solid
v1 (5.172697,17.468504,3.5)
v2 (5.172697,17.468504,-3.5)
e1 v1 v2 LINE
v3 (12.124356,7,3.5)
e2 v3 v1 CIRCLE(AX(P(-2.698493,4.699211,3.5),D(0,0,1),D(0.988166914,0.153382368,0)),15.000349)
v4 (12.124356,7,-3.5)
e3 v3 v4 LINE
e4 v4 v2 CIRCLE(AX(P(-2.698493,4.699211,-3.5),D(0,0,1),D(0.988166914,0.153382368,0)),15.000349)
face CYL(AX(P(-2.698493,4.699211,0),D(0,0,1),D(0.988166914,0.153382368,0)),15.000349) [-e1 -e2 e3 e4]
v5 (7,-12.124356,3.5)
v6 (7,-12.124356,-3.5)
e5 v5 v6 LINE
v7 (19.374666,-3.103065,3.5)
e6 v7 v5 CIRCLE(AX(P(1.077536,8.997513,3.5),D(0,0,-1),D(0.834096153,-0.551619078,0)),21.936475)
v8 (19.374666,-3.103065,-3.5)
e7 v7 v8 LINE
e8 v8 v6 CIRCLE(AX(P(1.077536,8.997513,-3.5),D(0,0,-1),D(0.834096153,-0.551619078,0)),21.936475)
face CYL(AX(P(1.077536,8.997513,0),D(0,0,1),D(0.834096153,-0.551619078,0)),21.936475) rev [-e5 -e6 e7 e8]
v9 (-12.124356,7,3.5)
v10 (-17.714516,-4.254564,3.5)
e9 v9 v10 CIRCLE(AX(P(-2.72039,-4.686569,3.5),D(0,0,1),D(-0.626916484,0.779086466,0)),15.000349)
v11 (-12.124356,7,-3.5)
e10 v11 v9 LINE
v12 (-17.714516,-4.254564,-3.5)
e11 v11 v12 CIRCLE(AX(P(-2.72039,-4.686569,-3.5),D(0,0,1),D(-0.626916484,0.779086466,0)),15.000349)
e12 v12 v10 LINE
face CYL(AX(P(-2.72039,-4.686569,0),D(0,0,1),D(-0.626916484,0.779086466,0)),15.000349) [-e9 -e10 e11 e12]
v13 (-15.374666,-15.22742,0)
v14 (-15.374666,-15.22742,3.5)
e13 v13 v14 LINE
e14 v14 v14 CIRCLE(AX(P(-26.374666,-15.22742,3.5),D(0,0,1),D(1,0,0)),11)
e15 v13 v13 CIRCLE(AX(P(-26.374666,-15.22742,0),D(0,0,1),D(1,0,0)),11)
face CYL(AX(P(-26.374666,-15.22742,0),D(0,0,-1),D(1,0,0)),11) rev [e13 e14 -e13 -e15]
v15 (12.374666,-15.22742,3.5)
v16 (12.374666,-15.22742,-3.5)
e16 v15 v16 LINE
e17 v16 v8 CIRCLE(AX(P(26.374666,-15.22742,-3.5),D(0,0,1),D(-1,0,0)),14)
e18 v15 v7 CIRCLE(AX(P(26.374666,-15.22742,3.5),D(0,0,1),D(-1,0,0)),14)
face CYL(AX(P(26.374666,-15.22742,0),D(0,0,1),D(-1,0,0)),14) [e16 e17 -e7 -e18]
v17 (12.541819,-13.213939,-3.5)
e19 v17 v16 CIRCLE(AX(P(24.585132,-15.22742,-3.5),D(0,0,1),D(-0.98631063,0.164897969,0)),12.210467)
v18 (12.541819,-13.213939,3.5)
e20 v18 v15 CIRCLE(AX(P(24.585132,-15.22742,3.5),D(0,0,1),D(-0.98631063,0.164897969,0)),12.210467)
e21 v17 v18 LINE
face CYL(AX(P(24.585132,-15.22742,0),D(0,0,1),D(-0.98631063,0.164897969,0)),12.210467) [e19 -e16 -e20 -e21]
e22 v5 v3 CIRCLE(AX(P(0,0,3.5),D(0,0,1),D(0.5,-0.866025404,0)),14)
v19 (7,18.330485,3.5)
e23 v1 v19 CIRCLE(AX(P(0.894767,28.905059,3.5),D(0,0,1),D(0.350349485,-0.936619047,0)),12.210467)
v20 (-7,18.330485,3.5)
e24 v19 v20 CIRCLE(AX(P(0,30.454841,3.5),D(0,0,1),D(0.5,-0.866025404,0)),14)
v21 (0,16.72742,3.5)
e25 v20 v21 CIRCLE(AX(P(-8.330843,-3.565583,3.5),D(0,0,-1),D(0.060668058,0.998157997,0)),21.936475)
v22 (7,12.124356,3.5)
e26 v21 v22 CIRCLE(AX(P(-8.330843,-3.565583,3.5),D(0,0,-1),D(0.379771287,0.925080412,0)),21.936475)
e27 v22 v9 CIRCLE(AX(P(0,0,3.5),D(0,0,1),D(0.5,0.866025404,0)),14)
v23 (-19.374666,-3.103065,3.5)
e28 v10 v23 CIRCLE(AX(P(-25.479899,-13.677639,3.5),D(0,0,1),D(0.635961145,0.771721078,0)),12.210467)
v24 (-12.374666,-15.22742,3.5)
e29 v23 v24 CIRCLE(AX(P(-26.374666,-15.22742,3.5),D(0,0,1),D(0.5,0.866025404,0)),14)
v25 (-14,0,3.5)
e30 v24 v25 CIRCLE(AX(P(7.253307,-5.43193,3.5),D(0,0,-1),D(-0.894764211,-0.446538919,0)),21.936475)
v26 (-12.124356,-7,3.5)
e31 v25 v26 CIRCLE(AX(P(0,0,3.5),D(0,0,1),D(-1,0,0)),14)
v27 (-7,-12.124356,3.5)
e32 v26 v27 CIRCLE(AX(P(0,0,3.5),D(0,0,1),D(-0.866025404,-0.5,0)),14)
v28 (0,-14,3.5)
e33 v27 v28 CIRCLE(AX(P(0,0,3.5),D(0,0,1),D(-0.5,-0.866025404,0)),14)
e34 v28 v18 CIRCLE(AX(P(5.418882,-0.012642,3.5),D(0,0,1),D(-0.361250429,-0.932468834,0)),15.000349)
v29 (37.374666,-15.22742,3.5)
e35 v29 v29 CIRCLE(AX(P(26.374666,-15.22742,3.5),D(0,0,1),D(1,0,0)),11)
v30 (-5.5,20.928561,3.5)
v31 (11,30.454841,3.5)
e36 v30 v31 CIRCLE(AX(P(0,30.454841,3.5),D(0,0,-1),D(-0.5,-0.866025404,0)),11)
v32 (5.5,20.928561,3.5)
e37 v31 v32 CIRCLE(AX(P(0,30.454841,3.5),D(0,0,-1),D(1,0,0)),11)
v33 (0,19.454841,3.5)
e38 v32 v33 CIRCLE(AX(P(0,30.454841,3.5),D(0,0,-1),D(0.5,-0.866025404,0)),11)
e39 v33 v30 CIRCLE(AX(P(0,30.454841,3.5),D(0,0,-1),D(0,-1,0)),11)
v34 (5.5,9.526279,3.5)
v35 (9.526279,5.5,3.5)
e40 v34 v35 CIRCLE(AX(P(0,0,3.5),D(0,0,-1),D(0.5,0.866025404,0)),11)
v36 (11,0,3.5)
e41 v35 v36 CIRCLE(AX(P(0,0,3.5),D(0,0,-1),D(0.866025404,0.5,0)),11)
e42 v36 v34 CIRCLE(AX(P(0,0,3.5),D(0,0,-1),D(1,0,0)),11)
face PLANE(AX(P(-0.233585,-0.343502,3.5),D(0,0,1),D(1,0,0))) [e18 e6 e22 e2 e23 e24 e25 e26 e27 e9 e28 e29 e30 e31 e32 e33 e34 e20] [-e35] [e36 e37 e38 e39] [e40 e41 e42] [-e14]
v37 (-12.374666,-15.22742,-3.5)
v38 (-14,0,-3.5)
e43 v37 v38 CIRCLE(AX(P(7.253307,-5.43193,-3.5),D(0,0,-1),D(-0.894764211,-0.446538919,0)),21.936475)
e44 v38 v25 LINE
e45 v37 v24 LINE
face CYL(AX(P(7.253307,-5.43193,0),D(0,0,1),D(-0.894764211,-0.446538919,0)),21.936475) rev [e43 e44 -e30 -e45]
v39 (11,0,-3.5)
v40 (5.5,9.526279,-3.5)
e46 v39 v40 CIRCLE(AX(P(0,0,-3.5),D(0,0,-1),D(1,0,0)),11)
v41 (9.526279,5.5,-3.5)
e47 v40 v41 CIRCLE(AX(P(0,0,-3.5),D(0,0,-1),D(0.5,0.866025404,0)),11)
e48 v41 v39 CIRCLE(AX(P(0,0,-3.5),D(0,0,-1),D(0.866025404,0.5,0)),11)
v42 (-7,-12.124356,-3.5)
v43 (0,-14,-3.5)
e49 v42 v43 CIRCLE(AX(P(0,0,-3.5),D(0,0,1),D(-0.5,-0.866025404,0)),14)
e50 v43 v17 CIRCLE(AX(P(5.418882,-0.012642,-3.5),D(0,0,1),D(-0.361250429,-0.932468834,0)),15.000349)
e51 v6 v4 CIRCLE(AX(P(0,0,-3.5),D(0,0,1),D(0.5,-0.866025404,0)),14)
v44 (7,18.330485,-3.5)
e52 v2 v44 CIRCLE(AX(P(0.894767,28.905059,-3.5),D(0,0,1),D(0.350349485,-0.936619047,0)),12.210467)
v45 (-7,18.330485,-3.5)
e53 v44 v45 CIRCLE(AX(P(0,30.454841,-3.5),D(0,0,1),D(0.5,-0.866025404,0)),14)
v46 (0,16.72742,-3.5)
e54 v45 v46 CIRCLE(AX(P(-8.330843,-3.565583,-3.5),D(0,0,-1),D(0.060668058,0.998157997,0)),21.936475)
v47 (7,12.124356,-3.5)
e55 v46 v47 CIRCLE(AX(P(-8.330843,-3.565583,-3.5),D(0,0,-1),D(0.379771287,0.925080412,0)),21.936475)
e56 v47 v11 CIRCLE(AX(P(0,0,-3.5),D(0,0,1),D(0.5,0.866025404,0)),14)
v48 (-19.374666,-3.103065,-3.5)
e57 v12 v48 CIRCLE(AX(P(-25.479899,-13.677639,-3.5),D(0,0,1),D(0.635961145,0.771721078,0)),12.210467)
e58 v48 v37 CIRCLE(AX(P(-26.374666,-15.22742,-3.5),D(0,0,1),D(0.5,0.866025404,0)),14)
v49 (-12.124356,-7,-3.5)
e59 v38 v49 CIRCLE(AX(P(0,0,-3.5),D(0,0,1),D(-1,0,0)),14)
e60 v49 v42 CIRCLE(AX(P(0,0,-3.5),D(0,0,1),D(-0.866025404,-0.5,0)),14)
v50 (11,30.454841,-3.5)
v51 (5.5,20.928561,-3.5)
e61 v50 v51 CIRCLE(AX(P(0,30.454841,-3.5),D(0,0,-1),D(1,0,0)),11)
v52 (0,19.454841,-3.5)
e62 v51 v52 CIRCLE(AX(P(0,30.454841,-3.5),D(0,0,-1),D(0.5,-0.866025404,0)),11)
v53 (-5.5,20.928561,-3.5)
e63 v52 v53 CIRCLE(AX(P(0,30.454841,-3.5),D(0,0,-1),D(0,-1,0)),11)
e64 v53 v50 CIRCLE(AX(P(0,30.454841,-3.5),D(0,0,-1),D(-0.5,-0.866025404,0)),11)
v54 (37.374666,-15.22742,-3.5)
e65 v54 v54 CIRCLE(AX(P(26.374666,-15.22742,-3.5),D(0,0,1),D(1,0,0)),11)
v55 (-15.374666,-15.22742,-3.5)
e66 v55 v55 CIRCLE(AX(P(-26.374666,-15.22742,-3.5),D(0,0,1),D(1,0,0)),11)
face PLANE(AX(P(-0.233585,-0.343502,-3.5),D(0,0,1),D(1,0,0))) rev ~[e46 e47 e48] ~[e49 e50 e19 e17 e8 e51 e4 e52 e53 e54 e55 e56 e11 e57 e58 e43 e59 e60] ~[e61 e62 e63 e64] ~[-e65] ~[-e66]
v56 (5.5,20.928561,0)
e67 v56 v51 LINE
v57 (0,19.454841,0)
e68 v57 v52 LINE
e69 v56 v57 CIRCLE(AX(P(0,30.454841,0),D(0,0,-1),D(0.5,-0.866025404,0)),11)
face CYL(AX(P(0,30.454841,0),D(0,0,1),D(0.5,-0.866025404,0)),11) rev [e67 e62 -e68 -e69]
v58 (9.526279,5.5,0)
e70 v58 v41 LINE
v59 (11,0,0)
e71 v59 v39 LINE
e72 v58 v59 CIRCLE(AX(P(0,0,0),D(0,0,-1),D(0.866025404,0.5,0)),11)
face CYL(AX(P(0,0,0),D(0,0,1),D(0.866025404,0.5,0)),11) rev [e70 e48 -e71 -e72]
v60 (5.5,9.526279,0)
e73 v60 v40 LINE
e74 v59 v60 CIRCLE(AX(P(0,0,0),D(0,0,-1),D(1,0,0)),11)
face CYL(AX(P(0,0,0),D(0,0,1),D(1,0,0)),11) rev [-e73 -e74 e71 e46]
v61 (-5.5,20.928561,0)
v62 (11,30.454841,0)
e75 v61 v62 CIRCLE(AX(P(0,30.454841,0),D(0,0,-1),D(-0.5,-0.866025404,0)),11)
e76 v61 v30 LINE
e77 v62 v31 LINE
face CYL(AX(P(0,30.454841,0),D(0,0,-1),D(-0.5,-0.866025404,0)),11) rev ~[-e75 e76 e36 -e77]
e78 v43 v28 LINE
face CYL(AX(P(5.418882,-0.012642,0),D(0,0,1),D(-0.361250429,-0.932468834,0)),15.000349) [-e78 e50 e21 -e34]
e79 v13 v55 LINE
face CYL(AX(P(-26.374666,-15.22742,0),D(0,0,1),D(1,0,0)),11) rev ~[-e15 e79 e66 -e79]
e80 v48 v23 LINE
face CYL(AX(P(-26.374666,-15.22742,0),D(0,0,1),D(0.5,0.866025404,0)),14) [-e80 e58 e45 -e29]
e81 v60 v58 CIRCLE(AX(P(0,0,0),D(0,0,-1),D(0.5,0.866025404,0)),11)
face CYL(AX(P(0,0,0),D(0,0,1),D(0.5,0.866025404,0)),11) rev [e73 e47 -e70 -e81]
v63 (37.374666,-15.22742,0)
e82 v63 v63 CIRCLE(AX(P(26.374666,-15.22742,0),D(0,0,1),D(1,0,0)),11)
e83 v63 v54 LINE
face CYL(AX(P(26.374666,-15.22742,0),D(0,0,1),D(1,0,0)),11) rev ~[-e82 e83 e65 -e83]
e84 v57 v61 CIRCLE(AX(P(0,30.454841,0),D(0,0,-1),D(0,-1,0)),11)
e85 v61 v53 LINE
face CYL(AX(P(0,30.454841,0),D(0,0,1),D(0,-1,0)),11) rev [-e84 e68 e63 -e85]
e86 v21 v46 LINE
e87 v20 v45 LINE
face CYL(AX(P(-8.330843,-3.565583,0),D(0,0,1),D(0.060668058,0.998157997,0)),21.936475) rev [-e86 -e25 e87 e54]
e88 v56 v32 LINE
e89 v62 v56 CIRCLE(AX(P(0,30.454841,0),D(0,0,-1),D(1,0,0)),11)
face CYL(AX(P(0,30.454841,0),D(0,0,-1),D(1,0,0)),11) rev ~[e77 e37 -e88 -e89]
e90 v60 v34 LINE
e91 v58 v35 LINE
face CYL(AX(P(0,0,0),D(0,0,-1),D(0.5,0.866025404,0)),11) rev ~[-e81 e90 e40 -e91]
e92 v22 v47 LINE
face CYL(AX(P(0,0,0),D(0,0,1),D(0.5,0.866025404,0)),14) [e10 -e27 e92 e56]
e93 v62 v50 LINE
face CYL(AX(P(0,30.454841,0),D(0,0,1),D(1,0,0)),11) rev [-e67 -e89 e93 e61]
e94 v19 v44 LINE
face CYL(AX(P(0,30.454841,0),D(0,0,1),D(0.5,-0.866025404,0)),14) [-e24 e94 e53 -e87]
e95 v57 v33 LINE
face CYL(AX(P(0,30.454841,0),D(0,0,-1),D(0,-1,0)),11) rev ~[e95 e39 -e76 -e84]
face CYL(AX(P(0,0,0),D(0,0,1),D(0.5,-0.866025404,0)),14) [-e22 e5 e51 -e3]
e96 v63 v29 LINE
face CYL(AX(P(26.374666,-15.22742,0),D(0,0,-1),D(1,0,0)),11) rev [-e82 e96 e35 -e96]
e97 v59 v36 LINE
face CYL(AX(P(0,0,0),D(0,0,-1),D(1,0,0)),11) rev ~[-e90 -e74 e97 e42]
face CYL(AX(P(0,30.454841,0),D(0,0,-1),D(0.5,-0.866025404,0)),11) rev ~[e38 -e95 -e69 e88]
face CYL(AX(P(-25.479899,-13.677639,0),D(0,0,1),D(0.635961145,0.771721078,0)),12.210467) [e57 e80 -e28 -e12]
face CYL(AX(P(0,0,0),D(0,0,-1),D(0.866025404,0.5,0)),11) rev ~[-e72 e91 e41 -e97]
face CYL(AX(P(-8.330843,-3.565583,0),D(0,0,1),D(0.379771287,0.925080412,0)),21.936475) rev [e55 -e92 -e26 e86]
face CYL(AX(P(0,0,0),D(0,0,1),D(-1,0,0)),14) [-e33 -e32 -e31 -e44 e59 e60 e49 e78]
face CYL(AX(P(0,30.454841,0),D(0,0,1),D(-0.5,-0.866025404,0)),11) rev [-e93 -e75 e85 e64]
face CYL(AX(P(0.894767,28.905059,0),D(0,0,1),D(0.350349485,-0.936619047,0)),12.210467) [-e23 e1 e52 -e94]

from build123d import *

# Parameters (mm, degrees)
F0_R     = 11
F1_DEPTH = 3.5


# Not quite as in the source:
# - a feature of the source that left no trace in its solid (it failed there, or was rolled back) is left out


with BuildPart() as f1:
    # F0 (on Top) → F1 (new body, symmetric)
    with BuildSketch(Plane.XY):
        with BuildLine():
            ThreePointArc((9.5262794416, 5.5), (10.6251840892, 2.8470094961), (11, 0))
            ThreePointArc((11, 0), (-9.5262794416, -5.5), (5.5, 9.5262794416))
            Line((5.5, 9.5262794416), (7, 12.124355653))
            ThreePointArc((7, 12.124355653), (-3.6234666314, 13.522961568), (-12.124355653, 7))
            ThreePointArc((-12.124355653, 7), (-13.522961568, 3.6234666314), (-14, 0))
            ThreePointArc((-14, 0), (-13.522961568, -3.6234666314), (-12.124355653, -7))
            ThreePointArc((-12.124355653, -7), (-9.8994949366, -9.8994949366), (-7, -12.124355653))
            ThreePointArc((-7, -12.124355653), (-3.6234666314, -13.522961568), (0, -14))
            ThreePointArc((0, -14), (3.6234666314, -13.522961568), (7, -12.124355653))
            ThreePointArc((7, -12.124355653), (13.522961568, -3.6234666314), (12.124355653, 7))
            Line((12.124355653, 7), (9.5262794416, 5.5))
        make_face()
        with BuildLine():
            ThreePointArc((5.5, 9.5262794416), (7.7781745931, 7.7781745931), (9.5262794416, 5.5))
            Line((9.5262794416, 5.5), (12.124355653, 7))
            ThreePointArc((12.124355653, 7), (9.7975961228, 12.9972967743), (5.1726973399, 17.4685035196))
            ThreePointArc((5.1726973399, 17.4685035196), (6.1042077739, 17.8616349143), (7, 18.3304848581))
            ThreePointArc((7, 18.3304848581), (0, 44.4548405111), (-7, 18.3304848581))
            ThreePointArc((-7, 18.3304848581), (-3.4339564303, 17.8173408021), (0, 16.7274202555))
            ThreePointArc((0, 16.7274202555), (3.7217872887, 14.7631656496), (7, 12.124355653))
            Line((7, 12.124355653), (5.5, 9.5262794416))
        make_face()
        with BuildLine():
            ThreePointArc((5.5, 20.9285610695), (2.8470094961, 19.8296564219), (0, 19.4548405111))
            ThreePointArc((0, 19.4548405111), (-2.8470094961, 19.8296564219), (-5.5, 20.9285610695))
            ThreePointArc((-5.5, 20.9285610695), (-5.5, 39.9811199527), (11, 30.4548405111))
            ThreePointArc((11, 30.4548405111), (9.5262794416, 24.9548405111), (5.5, 20.9285610695))
        make_face(mode=Mode.SUBTRACT)
        with BuildLine():
            ThreePointArc((-14, 0), (-13.522961568, 3.6234666314), (-12.124355653, 7))
            ThreePointArc((-12.124355653, 7), (-16.1547872485, 1.9863187512), (-17.714516484, -4.2545644573))
            ThreePointArc((-17.714516484, -4.2545644573), (-18.5207334759, -3.644418455), (-19.3746655508, -3.1030646026))
            ThreePointArc((-19.3746655508, -3.1030646026), (-38.4990212038, -22.2274202555), (-12.3746655508, -15.2274202555))
            ThreePointArc((-12.3746655508, -15.2274202555), (-14.5592658851, -7.760146629), (-14, 0))
        make_face()
        with Locations((-26.3746655508, -15.2274202555)):
            Circle(F0_R, mode=Mode.SUBTRACT)
        with BuildLine():
            ThreePointArc((19.3746655508, -3.1030646026), (14.0001170604, -8.7286208024), (7, -12.124355653))
            ThreePointArc((7, -12.124355653), (3.6234666314, -13.522961568), (0, -14))
            ThreePointArc((0, -14), (6.3571911257, -14.9836155256), (12.5418191441, -13.2139390623))
            ThreePointArc((12.5418191441, -13.2139390623), (12.416525702, -14.2172164593), (12.3746655508, -15.2274202555))
            ThreePointArc((12.3746655508, -15.2274202555), (38.4990212038, -22.2274202555), (19.3746655508, -3.1030646026))
        make_face()
        with Locations((26.3746655508, -15.2274202555)):
            Circle(F0_R, mode=Mode.SUBTRACT)
    extrude(amount=F1_DEPTH, both=True)


solid = f1.part
